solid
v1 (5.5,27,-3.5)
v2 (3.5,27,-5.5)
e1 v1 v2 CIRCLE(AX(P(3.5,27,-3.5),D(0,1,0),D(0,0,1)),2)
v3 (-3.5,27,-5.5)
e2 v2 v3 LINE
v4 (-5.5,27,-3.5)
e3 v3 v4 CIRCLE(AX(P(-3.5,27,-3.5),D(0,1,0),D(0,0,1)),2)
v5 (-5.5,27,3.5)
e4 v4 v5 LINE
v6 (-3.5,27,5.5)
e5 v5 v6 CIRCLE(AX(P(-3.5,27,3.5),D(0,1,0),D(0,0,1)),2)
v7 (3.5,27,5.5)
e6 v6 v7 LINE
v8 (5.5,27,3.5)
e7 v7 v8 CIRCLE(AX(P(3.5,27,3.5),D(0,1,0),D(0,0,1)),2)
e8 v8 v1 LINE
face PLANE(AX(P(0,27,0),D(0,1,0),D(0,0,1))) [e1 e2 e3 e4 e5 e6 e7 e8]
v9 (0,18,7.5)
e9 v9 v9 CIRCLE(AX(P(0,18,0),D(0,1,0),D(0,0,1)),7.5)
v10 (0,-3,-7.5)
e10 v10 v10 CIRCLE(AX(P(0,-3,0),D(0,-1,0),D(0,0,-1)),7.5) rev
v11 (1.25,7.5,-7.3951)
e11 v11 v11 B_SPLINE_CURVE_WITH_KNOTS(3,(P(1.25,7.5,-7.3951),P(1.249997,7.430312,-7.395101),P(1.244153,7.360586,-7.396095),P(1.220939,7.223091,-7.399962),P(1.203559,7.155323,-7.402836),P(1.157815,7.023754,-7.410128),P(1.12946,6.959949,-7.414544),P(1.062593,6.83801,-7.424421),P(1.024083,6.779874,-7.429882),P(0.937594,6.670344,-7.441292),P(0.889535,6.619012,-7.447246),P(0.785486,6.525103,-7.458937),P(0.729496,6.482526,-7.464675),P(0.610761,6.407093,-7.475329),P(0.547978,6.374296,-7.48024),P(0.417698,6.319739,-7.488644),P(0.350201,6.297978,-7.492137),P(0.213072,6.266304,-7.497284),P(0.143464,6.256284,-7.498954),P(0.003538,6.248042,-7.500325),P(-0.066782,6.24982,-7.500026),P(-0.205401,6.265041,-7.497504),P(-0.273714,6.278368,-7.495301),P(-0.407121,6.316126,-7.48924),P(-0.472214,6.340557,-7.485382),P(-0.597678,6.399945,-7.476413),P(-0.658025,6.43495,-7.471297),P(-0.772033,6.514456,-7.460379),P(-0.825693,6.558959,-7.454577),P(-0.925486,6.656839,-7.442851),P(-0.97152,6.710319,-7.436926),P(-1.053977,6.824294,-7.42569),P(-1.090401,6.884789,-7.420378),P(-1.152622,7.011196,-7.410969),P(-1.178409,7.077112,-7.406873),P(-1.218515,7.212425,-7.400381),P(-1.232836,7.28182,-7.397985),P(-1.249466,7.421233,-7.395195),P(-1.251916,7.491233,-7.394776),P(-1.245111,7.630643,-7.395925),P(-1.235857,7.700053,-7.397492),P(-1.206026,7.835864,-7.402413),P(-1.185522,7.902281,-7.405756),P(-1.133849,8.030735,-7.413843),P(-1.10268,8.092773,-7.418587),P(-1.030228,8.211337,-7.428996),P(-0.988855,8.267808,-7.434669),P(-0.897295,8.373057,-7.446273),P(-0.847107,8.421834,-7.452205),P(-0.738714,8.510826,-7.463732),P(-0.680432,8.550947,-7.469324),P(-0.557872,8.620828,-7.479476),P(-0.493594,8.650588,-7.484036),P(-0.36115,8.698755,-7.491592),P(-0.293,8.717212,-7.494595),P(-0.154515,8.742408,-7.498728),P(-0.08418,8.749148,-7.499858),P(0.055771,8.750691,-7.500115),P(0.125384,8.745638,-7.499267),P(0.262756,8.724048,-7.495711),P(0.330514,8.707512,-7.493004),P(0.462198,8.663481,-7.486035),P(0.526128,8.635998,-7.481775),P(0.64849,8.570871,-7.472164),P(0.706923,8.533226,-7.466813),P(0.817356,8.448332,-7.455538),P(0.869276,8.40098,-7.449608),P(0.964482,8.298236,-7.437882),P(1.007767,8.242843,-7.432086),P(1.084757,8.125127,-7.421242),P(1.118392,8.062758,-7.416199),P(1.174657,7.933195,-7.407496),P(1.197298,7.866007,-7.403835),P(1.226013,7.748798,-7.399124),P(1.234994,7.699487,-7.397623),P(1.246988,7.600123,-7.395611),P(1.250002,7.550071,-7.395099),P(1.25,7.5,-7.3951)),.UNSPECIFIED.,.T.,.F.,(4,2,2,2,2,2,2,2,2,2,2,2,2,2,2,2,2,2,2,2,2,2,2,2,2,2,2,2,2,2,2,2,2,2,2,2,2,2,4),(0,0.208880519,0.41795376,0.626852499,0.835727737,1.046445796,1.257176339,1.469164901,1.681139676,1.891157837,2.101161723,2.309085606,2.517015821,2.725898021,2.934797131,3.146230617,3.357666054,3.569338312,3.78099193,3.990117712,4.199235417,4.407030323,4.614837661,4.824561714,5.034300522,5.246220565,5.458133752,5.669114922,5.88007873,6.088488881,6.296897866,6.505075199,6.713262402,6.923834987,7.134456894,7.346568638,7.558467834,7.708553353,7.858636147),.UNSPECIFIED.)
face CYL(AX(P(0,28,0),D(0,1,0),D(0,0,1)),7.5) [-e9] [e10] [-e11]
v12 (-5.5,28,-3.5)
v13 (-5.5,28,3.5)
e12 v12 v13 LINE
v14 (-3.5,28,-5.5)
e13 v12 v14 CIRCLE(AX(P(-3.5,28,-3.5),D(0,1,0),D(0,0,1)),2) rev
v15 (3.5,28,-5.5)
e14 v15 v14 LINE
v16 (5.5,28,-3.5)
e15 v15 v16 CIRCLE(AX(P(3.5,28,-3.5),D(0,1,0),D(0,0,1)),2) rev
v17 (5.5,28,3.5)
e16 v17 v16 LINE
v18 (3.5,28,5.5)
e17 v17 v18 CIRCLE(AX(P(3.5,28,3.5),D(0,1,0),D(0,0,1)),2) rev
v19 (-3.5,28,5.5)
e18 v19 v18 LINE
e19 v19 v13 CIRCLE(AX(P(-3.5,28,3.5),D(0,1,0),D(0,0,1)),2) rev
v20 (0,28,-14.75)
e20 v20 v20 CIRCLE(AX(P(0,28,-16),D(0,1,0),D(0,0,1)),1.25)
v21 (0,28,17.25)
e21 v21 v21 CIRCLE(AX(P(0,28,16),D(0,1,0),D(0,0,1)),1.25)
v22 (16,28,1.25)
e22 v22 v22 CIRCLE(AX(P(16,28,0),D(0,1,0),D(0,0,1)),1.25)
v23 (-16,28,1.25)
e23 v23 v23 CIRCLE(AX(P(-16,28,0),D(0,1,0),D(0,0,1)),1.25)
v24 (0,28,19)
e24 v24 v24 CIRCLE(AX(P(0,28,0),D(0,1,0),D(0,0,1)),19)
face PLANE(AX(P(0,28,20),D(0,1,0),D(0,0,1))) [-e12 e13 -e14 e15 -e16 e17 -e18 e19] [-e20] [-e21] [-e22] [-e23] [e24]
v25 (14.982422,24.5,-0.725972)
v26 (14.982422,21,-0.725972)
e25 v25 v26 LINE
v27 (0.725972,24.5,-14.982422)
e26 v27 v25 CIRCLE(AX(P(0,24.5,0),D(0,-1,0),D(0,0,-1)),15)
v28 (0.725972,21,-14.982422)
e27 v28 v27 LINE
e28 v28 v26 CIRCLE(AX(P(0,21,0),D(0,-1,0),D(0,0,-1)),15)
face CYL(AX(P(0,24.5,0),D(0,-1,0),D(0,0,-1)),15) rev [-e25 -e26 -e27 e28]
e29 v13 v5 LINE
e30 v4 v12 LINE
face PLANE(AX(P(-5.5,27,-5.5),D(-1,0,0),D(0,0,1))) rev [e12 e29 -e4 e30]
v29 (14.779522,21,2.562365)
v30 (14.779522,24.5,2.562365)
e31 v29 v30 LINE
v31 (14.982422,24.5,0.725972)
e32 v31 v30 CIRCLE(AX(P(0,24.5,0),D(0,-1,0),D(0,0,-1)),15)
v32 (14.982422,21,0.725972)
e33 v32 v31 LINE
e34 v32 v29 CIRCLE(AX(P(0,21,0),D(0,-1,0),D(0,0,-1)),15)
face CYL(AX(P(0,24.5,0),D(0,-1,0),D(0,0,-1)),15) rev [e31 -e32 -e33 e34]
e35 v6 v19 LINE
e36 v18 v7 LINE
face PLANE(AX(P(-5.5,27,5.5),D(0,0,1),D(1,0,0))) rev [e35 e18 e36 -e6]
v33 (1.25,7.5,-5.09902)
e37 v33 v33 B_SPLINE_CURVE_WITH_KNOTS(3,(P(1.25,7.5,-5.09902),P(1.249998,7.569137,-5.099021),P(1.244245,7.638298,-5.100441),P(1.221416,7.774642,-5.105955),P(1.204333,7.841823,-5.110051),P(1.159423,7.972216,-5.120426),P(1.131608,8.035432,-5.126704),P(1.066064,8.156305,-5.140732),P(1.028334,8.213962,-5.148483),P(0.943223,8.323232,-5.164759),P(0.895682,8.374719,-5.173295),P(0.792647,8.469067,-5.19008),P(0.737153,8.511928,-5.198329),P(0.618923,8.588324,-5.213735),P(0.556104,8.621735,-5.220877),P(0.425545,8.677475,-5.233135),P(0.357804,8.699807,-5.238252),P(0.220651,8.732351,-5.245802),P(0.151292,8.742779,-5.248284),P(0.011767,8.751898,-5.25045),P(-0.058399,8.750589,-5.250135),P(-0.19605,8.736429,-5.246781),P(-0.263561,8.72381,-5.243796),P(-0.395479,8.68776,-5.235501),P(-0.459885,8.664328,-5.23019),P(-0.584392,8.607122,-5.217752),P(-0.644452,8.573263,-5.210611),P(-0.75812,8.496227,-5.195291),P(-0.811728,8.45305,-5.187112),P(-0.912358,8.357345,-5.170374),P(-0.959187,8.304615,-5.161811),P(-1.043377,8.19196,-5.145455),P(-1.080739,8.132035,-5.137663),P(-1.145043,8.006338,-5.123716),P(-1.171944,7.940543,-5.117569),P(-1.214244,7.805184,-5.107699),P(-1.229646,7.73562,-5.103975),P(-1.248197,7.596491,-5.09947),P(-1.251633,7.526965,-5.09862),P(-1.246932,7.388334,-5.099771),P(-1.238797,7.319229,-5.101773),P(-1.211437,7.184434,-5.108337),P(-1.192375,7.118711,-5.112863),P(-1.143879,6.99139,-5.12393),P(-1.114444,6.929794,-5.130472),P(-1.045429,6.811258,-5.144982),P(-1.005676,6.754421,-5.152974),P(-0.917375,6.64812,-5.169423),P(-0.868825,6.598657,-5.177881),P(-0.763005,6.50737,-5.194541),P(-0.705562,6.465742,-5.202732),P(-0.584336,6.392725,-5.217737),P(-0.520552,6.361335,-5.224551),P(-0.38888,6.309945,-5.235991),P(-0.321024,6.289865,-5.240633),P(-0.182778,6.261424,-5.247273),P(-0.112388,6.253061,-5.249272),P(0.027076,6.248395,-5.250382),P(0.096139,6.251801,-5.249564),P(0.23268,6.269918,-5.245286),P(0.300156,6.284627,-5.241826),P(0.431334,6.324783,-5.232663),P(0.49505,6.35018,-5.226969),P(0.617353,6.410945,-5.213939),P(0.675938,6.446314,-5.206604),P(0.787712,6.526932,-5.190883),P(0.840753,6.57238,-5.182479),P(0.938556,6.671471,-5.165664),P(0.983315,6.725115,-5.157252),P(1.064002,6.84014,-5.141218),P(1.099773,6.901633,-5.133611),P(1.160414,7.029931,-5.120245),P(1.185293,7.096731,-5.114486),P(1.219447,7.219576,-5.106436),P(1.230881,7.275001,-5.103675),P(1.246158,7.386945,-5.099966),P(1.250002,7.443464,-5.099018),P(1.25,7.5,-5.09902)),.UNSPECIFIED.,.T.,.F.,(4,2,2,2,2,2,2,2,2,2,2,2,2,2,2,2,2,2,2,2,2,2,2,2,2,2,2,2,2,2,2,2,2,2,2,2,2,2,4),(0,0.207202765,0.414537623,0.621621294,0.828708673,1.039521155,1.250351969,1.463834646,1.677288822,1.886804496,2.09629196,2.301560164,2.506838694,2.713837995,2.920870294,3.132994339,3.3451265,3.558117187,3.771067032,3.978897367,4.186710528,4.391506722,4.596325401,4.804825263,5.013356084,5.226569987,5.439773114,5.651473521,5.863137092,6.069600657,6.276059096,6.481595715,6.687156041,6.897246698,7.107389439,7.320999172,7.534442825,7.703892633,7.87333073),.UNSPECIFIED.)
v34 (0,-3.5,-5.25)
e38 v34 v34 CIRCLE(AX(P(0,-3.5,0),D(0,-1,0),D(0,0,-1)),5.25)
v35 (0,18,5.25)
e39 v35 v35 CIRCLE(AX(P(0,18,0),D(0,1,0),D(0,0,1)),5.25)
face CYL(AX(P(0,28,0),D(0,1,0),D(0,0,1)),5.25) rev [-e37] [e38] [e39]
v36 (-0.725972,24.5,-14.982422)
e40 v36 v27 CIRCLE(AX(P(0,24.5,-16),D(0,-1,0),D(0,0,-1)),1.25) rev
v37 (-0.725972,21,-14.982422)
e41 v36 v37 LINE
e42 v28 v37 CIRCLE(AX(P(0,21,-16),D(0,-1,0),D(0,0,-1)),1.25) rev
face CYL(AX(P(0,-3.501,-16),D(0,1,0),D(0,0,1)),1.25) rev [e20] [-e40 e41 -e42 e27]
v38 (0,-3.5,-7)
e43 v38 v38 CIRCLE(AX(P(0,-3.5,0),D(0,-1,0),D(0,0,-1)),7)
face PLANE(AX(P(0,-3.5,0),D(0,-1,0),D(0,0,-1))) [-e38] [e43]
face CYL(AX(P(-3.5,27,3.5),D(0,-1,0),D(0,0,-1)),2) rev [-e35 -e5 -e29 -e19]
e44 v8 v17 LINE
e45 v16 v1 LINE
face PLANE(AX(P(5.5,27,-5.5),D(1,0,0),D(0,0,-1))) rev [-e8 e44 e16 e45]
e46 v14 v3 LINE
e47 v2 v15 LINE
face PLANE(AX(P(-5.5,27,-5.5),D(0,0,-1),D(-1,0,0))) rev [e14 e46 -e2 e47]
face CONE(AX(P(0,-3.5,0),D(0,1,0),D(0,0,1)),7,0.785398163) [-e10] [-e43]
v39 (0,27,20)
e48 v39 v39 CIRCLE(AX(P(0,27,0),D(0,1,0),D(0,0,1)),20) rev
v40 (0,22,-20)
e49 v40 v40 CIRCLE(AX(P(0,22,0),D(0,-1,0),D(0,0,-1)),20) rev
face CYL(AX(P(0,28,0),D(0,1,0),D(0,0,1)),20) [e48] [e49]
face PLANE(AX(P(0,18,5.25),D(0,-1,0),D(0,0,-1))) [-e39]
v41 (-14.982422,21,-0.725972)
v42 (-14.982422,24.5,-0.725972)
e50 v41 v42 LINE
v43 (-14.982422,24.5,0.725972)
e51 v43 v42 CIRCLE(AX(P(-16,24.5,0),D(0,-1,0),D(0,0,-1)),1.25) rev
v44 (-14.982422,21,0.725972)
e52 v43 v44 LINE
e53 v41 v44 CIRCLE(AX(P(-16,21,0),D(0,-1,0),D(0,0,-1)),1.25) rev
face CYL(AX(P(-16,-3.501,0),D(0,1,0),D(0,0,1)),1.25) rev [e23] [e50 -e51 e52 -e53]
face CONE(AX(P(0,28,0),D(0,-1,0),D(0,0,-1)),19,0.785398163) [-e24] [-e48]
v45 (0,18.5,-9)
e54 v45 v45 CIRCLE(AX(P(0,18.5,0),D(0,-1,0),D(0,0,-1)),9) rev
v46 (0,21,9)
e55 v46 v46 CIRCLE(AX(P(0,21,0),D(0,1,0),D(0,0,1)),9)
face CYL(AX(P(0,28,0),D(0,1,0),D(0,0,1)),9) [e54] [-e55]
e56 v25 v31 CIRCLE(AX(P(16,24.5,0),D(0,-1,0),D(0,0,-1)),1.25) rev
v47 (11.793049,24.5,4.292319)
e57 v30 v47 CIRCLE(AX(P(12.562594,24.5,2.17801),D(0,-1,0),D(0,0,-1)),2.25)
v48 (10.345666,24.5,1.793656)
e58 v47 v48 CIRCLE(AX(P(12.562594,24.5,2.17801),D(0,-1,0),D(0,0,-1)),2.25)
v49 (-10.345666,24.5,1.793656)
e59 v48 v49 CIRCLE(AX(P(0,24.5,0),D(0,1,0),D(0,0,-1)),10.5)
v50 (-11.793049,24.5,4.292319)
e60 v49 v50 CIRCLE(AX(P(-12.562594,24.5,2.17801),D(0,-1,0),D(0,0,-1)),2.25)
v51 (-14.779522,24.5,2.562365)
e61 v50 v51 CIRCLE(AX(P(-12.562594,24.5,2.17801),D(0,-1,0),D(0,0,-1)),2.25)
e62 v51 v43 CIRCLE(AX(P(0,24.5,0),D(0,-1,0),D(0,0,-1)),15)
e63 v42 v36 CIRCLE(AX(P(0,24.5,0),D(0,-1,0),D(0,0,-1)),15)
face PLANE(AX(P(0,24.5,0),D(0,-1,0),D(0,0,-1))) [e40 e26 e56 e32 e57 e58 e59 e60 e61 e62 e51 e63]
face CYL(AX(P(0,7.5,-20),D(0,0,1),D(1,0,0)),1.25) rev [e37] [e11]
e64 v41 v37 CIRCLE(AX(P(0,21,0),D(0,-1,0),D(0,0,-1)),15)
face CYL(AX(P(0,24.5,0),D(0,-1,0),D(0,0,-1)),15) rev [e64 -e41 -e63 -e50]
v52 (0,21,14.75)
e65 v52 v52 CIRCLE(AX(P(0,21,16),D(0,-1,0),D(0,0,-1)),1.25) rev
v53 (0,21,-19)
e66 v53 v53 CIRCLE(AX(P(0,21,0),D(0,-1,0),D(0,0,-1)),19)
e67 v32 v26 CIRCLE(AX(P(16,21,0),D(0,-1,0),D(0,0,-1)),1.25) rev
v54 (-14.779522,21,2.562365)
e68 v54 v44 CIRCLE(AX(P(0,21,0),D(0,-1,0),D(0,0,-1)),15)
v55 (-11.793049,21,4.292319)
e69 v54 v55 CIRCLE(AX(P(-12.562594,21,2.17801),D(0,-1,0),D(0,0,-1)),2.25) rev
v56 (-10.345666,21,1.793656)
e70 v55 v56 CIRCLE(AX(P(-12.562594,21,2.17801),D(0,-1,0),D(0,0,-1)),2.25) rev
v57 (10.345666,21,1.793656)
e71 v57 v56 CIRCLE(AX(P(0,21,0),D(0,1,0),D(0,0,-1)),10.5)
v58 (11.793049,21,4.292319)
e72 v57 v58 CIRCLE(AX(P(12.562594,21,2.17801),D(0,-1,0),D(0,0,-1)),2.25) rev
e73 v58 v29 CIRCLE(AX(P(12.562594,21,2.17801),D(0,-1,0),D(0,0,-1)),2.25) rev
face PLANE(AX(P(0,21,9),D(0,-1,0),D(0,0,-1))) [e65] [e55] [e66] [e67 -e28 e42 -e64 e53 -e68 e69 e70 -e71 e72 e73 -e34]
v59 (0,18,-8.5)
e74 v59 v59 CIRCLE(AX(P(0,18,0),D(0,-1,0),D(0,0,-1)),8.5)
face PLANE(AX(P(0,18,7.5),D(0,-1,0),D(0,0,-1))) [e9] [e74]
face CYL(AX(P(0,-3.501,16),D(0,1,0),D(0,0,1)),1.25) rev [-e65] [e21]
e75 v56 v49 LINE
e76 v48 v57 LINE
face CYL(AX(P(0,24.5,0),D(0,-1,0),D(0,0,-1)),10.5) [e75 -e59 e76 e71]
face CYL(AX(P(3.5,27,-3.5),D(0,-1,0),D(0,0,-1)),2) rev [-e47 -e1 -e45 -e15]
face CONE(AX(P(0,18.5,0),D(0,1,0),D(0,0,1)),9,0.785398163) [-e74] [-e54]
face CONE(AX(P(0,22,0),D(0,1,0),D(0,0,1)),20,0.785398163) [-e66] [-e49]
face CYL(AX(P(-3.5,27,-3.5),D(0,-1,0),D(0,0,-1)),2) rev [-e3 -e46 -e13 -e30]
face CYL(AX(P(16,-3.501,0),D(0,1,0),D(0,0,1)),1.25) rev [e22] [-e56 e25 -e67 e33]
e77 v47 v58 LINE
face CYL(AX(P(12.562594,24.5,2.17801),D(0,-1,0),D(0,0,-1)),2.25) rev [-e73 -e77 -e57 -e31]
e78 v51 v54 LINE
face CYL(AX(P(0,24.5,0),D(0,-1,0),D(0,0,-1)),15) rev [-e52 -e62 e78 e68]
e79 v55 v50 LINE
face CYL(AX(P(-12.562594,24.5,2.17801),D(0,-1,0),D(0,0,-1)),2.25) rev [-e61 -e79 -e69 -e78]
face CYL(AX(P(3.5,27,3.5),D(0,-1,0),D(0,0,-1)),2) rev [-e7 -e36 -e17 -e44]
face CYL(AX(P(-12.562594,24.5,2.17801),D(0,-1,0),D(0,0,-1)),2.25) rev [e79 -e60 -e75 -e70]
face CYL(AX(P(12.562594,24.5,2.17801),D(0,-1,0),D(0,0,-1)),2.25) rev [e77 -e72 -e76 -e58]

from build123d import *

# Parameters (mm, degrees)
SKETCH_2_W             = 11
SKETCH_2_H             = 11
CUT_EXTRUDE_1_DEPTH    = 1
FILLET_1_R             = 2
SKETCH_5_R             = 7.5
SKETCH_5_R_2           = 5.25
EXTRUDE_1_DEPTH        = 3.5
SKETCH_6_R             = 1.25
CUT_EXTRUDE_M3_1_DEPTH = 40.799497484
CHAMFER_1_SIZE         = 0.5
CUT_EXTRUDE_M3_REACH   = 44.335
SKETCH_7_R             = 1.25
CHAMFER_2_SIZE         = 1
CUT_EXTRUDE_14_DEPTH   = 3.5
FILLET_2_R             = 2.25


with BuildPart() as part:
    # 草图1 → 旋转1 (revolve)
    with BuildSketch(Plane(origin=(0, 0, 0), x_dir=(0, 0, -1), z_dir=(1, 0, 0))):
        Polygon((-7.5, 0), (-5.25, 0), (-5.25, 18), (0, 18), (0, 28), (-20, 28), (-20, 21), (-9, 21), (-9, 18), (-7.5, 18), align=None)
    revolve(axis=Axis((0, 28, 0), (0, -1, 0)))

    # 草图2 → 切除-拉伸1 (cut)
    with BuildSketch(Plane(origin=(0, 28, 0), x_dir=(1, 0, 0), z_dir=(0, 1, 0))):
        Rectangle(SKETCH_2_W, SKETCH_2_H)
    extrude(amount=-CUT_EXTRUDE_1_DEPTH, mode=Mode.SUBTRACT)

    # 圆角1
    fillet_1_edges = [part.edges().sort_by_distance(p)[0] for p in [
        (5.5, 27.5, -5.5),
        (5.5, 27.5, 5.5),
        (-5.5, 27.5, 5.5),
        (-5.5, 27.5, -5.5),
    ]]
    fillet(fillet_1_edges, radius=FILLET_1_R)

    # 草图5 → 凸台-拉伸1 (add)
    with BuildSketch(Plane.XZ):
        with Locations(Location((0, 0, 0), (0, 0, 90))):
            Circle(SKETCH_5_R)
        with Locations(Location((0, 0, 0), (0, 0, 90))):
            Circle(SKETCH_5_R_2, mode=Mode.SUBTRACT)
    extrude(amount=EXTRUDE_1_DEPTH)

    # 草图6 → M3螺纹孔1 (cut, through all)
    with BuildSketch(Plane.XY):
        with Locations((0, 7.5)):
            Circle(SKETCH_6_R)
    extrude(amount=-CUT_EXTRUDE_M3_1_DEPTH, mode=Mode.SUBTRACT)

    # 倒角1
    chamfer_1_edges = [part.edges().sort_by_distance(p)[0] for p in [
        (0, -3.5, -7.5),
        (0, 18, -9),
    ]]
    chamfer(chamfer_1_edges, length=CHAMFER_1_SIZE)

    # 草图7 → M3螺纹孔 (cut, up to next)
    with BuildSketch(Plane(origin=(0, 28, 0), x_dir=(1, 0, 0), z_dir=(0, 1, 0)), mode=Mode.PRIVATE) as cut_extrude_m3_sk1:
        with Locations(Location((0, 16, 0), (0, 0, 270))):
            Circle(SKETCH_7_R)
    cut_extrude_m3_tool1 = extrude(cut_extrude_m3_sk1.sketch, amount=-CUT_EXTRUDE_M3_REACH, mode=Mode.PRIVATE) & part.part
    # 草图7 → M3螺纹孔 (cut, up to next)
    with BuildSketch(Plane(origin=(0, 28, 0), x_dir=(1, 0, 0), z_dir=(0, 1, 0)), mode=Mode.PRIVATE) as cut_extrude_m3_sk2:
        with Locations(Location((16, 0, 0), (0, 0, 270))):
            Circle(SKETCH_7_R)
    cut_extrude_m3_tool2 = extrude(cut_extrude_m3_sk2.sketch, amount=-CUT_EXTRUDE_M3_REACH, mode=Mode.PRIVATE) & part.part
    # 草图7 → M3螺纹孔 (cut, up to next)
    with BuildSketch(Plane(origin=(0, 28, 0), x_dir=(1, 0, 0), z_dir=(0, 1, 0)), mode=Mode.PRIVATE) as cut_extrude_m3_sk3:
        with Locations(Location((0, -16, 0), (0, 0, 270))):
            Circle(SKETCH_7_R)
    cut_extrude_m3_tool3 = extrude(cut_extrude_m3_sk3.sketch, amount=-CUT_EXTRUDE_M3_REACH, mode=Mode.PRIVATE) & part.part
    # 草图7 → M3螺纹孔 (cut, up to next)
    with BuildSketch(Plane(origin=(0, 28, 0), x_dir=(1, 0, 0), z_dir=(0, 1, 0)), mode=Mode.PRIVATE) as cut_extrude_m3_sk4:
        with Locations(Location((-16, 0, 0), (0, 0, 270))):
            Circle(SKETCH_7_R)
    cut_extrude_m3_tool4 = extrude(cut_extrude_m3_sk4.sketch, amount=-CUT_EXTRUDE_M3_REACH, mode=Mode.PRIVATE) & part.part
    add(cut_extrude_m3_tool1.solids().sort_by_distance((0, 28, -16))[0], mode=Mode.SUBTRACT)
    add(cut_extrude_m3_tool2.solids().sort_by_distance((16, 28, 0))[0], mode=Mode.SUBTRACT)
    add(cut_extrude_m3_tool3.solids().sort_by_distance((0, 28, 16))[0], mode=Mode.SUBTRACT)
    add(cut_extrude_m3_tool4.solids().sort_by_distance((-16, 28, 0))[0], mode=Mode.SUBTRACT)

    # 倒角2
    chamfer_2_edges = [part.edges().sort_by_distance(p)[0] for p in [
        (0, 28, -20),
        (0, 21, -20),
    ]]
    chamfer(chamfer_2_edges, length=CHAMFER_2_SIZE)

    # 草图8 → 切除-拉伸14 (cut)
    with BuildSketch(Plane.XZ.offset(-21)):
        with BuildLine():
            Line((-9.866772518, 3.591211505), (-14.095389312, 5.13030215))
            ThreePointArc((-14.095389312, 5.13030215), (0, -15), (14.095389312, 5.13030215))
            Line((14.095389312, 5.13030215), (9.866772518, 3.591211505))
            ThreePointArc((9.866772518, 3.591211505), (0, -10.5), (-9.866772518, 3.591211505))
        make_face()
    extrude(amount=-CUT_EXTRUDE_14_DEPTH, mode=Mode.SUBTRACT)

    # 圆角2
    fillet_2_edges = [part.edges().sort_by_distance(p)[0] for p in [
        (9.866772518, 22.75, 3.591211505),
        (14.095389312, 22.75, 5.13030215),
        (-9.866772518, 22.75, 3.591211505),
        (-14.095389312, 22.75, 5.13030215),
    ]]
    fillet(fillet_2_edges, radius=FILLET_2_R - 0.0001)  # a hair under: the kernel refuses the full size


solid = part.part
